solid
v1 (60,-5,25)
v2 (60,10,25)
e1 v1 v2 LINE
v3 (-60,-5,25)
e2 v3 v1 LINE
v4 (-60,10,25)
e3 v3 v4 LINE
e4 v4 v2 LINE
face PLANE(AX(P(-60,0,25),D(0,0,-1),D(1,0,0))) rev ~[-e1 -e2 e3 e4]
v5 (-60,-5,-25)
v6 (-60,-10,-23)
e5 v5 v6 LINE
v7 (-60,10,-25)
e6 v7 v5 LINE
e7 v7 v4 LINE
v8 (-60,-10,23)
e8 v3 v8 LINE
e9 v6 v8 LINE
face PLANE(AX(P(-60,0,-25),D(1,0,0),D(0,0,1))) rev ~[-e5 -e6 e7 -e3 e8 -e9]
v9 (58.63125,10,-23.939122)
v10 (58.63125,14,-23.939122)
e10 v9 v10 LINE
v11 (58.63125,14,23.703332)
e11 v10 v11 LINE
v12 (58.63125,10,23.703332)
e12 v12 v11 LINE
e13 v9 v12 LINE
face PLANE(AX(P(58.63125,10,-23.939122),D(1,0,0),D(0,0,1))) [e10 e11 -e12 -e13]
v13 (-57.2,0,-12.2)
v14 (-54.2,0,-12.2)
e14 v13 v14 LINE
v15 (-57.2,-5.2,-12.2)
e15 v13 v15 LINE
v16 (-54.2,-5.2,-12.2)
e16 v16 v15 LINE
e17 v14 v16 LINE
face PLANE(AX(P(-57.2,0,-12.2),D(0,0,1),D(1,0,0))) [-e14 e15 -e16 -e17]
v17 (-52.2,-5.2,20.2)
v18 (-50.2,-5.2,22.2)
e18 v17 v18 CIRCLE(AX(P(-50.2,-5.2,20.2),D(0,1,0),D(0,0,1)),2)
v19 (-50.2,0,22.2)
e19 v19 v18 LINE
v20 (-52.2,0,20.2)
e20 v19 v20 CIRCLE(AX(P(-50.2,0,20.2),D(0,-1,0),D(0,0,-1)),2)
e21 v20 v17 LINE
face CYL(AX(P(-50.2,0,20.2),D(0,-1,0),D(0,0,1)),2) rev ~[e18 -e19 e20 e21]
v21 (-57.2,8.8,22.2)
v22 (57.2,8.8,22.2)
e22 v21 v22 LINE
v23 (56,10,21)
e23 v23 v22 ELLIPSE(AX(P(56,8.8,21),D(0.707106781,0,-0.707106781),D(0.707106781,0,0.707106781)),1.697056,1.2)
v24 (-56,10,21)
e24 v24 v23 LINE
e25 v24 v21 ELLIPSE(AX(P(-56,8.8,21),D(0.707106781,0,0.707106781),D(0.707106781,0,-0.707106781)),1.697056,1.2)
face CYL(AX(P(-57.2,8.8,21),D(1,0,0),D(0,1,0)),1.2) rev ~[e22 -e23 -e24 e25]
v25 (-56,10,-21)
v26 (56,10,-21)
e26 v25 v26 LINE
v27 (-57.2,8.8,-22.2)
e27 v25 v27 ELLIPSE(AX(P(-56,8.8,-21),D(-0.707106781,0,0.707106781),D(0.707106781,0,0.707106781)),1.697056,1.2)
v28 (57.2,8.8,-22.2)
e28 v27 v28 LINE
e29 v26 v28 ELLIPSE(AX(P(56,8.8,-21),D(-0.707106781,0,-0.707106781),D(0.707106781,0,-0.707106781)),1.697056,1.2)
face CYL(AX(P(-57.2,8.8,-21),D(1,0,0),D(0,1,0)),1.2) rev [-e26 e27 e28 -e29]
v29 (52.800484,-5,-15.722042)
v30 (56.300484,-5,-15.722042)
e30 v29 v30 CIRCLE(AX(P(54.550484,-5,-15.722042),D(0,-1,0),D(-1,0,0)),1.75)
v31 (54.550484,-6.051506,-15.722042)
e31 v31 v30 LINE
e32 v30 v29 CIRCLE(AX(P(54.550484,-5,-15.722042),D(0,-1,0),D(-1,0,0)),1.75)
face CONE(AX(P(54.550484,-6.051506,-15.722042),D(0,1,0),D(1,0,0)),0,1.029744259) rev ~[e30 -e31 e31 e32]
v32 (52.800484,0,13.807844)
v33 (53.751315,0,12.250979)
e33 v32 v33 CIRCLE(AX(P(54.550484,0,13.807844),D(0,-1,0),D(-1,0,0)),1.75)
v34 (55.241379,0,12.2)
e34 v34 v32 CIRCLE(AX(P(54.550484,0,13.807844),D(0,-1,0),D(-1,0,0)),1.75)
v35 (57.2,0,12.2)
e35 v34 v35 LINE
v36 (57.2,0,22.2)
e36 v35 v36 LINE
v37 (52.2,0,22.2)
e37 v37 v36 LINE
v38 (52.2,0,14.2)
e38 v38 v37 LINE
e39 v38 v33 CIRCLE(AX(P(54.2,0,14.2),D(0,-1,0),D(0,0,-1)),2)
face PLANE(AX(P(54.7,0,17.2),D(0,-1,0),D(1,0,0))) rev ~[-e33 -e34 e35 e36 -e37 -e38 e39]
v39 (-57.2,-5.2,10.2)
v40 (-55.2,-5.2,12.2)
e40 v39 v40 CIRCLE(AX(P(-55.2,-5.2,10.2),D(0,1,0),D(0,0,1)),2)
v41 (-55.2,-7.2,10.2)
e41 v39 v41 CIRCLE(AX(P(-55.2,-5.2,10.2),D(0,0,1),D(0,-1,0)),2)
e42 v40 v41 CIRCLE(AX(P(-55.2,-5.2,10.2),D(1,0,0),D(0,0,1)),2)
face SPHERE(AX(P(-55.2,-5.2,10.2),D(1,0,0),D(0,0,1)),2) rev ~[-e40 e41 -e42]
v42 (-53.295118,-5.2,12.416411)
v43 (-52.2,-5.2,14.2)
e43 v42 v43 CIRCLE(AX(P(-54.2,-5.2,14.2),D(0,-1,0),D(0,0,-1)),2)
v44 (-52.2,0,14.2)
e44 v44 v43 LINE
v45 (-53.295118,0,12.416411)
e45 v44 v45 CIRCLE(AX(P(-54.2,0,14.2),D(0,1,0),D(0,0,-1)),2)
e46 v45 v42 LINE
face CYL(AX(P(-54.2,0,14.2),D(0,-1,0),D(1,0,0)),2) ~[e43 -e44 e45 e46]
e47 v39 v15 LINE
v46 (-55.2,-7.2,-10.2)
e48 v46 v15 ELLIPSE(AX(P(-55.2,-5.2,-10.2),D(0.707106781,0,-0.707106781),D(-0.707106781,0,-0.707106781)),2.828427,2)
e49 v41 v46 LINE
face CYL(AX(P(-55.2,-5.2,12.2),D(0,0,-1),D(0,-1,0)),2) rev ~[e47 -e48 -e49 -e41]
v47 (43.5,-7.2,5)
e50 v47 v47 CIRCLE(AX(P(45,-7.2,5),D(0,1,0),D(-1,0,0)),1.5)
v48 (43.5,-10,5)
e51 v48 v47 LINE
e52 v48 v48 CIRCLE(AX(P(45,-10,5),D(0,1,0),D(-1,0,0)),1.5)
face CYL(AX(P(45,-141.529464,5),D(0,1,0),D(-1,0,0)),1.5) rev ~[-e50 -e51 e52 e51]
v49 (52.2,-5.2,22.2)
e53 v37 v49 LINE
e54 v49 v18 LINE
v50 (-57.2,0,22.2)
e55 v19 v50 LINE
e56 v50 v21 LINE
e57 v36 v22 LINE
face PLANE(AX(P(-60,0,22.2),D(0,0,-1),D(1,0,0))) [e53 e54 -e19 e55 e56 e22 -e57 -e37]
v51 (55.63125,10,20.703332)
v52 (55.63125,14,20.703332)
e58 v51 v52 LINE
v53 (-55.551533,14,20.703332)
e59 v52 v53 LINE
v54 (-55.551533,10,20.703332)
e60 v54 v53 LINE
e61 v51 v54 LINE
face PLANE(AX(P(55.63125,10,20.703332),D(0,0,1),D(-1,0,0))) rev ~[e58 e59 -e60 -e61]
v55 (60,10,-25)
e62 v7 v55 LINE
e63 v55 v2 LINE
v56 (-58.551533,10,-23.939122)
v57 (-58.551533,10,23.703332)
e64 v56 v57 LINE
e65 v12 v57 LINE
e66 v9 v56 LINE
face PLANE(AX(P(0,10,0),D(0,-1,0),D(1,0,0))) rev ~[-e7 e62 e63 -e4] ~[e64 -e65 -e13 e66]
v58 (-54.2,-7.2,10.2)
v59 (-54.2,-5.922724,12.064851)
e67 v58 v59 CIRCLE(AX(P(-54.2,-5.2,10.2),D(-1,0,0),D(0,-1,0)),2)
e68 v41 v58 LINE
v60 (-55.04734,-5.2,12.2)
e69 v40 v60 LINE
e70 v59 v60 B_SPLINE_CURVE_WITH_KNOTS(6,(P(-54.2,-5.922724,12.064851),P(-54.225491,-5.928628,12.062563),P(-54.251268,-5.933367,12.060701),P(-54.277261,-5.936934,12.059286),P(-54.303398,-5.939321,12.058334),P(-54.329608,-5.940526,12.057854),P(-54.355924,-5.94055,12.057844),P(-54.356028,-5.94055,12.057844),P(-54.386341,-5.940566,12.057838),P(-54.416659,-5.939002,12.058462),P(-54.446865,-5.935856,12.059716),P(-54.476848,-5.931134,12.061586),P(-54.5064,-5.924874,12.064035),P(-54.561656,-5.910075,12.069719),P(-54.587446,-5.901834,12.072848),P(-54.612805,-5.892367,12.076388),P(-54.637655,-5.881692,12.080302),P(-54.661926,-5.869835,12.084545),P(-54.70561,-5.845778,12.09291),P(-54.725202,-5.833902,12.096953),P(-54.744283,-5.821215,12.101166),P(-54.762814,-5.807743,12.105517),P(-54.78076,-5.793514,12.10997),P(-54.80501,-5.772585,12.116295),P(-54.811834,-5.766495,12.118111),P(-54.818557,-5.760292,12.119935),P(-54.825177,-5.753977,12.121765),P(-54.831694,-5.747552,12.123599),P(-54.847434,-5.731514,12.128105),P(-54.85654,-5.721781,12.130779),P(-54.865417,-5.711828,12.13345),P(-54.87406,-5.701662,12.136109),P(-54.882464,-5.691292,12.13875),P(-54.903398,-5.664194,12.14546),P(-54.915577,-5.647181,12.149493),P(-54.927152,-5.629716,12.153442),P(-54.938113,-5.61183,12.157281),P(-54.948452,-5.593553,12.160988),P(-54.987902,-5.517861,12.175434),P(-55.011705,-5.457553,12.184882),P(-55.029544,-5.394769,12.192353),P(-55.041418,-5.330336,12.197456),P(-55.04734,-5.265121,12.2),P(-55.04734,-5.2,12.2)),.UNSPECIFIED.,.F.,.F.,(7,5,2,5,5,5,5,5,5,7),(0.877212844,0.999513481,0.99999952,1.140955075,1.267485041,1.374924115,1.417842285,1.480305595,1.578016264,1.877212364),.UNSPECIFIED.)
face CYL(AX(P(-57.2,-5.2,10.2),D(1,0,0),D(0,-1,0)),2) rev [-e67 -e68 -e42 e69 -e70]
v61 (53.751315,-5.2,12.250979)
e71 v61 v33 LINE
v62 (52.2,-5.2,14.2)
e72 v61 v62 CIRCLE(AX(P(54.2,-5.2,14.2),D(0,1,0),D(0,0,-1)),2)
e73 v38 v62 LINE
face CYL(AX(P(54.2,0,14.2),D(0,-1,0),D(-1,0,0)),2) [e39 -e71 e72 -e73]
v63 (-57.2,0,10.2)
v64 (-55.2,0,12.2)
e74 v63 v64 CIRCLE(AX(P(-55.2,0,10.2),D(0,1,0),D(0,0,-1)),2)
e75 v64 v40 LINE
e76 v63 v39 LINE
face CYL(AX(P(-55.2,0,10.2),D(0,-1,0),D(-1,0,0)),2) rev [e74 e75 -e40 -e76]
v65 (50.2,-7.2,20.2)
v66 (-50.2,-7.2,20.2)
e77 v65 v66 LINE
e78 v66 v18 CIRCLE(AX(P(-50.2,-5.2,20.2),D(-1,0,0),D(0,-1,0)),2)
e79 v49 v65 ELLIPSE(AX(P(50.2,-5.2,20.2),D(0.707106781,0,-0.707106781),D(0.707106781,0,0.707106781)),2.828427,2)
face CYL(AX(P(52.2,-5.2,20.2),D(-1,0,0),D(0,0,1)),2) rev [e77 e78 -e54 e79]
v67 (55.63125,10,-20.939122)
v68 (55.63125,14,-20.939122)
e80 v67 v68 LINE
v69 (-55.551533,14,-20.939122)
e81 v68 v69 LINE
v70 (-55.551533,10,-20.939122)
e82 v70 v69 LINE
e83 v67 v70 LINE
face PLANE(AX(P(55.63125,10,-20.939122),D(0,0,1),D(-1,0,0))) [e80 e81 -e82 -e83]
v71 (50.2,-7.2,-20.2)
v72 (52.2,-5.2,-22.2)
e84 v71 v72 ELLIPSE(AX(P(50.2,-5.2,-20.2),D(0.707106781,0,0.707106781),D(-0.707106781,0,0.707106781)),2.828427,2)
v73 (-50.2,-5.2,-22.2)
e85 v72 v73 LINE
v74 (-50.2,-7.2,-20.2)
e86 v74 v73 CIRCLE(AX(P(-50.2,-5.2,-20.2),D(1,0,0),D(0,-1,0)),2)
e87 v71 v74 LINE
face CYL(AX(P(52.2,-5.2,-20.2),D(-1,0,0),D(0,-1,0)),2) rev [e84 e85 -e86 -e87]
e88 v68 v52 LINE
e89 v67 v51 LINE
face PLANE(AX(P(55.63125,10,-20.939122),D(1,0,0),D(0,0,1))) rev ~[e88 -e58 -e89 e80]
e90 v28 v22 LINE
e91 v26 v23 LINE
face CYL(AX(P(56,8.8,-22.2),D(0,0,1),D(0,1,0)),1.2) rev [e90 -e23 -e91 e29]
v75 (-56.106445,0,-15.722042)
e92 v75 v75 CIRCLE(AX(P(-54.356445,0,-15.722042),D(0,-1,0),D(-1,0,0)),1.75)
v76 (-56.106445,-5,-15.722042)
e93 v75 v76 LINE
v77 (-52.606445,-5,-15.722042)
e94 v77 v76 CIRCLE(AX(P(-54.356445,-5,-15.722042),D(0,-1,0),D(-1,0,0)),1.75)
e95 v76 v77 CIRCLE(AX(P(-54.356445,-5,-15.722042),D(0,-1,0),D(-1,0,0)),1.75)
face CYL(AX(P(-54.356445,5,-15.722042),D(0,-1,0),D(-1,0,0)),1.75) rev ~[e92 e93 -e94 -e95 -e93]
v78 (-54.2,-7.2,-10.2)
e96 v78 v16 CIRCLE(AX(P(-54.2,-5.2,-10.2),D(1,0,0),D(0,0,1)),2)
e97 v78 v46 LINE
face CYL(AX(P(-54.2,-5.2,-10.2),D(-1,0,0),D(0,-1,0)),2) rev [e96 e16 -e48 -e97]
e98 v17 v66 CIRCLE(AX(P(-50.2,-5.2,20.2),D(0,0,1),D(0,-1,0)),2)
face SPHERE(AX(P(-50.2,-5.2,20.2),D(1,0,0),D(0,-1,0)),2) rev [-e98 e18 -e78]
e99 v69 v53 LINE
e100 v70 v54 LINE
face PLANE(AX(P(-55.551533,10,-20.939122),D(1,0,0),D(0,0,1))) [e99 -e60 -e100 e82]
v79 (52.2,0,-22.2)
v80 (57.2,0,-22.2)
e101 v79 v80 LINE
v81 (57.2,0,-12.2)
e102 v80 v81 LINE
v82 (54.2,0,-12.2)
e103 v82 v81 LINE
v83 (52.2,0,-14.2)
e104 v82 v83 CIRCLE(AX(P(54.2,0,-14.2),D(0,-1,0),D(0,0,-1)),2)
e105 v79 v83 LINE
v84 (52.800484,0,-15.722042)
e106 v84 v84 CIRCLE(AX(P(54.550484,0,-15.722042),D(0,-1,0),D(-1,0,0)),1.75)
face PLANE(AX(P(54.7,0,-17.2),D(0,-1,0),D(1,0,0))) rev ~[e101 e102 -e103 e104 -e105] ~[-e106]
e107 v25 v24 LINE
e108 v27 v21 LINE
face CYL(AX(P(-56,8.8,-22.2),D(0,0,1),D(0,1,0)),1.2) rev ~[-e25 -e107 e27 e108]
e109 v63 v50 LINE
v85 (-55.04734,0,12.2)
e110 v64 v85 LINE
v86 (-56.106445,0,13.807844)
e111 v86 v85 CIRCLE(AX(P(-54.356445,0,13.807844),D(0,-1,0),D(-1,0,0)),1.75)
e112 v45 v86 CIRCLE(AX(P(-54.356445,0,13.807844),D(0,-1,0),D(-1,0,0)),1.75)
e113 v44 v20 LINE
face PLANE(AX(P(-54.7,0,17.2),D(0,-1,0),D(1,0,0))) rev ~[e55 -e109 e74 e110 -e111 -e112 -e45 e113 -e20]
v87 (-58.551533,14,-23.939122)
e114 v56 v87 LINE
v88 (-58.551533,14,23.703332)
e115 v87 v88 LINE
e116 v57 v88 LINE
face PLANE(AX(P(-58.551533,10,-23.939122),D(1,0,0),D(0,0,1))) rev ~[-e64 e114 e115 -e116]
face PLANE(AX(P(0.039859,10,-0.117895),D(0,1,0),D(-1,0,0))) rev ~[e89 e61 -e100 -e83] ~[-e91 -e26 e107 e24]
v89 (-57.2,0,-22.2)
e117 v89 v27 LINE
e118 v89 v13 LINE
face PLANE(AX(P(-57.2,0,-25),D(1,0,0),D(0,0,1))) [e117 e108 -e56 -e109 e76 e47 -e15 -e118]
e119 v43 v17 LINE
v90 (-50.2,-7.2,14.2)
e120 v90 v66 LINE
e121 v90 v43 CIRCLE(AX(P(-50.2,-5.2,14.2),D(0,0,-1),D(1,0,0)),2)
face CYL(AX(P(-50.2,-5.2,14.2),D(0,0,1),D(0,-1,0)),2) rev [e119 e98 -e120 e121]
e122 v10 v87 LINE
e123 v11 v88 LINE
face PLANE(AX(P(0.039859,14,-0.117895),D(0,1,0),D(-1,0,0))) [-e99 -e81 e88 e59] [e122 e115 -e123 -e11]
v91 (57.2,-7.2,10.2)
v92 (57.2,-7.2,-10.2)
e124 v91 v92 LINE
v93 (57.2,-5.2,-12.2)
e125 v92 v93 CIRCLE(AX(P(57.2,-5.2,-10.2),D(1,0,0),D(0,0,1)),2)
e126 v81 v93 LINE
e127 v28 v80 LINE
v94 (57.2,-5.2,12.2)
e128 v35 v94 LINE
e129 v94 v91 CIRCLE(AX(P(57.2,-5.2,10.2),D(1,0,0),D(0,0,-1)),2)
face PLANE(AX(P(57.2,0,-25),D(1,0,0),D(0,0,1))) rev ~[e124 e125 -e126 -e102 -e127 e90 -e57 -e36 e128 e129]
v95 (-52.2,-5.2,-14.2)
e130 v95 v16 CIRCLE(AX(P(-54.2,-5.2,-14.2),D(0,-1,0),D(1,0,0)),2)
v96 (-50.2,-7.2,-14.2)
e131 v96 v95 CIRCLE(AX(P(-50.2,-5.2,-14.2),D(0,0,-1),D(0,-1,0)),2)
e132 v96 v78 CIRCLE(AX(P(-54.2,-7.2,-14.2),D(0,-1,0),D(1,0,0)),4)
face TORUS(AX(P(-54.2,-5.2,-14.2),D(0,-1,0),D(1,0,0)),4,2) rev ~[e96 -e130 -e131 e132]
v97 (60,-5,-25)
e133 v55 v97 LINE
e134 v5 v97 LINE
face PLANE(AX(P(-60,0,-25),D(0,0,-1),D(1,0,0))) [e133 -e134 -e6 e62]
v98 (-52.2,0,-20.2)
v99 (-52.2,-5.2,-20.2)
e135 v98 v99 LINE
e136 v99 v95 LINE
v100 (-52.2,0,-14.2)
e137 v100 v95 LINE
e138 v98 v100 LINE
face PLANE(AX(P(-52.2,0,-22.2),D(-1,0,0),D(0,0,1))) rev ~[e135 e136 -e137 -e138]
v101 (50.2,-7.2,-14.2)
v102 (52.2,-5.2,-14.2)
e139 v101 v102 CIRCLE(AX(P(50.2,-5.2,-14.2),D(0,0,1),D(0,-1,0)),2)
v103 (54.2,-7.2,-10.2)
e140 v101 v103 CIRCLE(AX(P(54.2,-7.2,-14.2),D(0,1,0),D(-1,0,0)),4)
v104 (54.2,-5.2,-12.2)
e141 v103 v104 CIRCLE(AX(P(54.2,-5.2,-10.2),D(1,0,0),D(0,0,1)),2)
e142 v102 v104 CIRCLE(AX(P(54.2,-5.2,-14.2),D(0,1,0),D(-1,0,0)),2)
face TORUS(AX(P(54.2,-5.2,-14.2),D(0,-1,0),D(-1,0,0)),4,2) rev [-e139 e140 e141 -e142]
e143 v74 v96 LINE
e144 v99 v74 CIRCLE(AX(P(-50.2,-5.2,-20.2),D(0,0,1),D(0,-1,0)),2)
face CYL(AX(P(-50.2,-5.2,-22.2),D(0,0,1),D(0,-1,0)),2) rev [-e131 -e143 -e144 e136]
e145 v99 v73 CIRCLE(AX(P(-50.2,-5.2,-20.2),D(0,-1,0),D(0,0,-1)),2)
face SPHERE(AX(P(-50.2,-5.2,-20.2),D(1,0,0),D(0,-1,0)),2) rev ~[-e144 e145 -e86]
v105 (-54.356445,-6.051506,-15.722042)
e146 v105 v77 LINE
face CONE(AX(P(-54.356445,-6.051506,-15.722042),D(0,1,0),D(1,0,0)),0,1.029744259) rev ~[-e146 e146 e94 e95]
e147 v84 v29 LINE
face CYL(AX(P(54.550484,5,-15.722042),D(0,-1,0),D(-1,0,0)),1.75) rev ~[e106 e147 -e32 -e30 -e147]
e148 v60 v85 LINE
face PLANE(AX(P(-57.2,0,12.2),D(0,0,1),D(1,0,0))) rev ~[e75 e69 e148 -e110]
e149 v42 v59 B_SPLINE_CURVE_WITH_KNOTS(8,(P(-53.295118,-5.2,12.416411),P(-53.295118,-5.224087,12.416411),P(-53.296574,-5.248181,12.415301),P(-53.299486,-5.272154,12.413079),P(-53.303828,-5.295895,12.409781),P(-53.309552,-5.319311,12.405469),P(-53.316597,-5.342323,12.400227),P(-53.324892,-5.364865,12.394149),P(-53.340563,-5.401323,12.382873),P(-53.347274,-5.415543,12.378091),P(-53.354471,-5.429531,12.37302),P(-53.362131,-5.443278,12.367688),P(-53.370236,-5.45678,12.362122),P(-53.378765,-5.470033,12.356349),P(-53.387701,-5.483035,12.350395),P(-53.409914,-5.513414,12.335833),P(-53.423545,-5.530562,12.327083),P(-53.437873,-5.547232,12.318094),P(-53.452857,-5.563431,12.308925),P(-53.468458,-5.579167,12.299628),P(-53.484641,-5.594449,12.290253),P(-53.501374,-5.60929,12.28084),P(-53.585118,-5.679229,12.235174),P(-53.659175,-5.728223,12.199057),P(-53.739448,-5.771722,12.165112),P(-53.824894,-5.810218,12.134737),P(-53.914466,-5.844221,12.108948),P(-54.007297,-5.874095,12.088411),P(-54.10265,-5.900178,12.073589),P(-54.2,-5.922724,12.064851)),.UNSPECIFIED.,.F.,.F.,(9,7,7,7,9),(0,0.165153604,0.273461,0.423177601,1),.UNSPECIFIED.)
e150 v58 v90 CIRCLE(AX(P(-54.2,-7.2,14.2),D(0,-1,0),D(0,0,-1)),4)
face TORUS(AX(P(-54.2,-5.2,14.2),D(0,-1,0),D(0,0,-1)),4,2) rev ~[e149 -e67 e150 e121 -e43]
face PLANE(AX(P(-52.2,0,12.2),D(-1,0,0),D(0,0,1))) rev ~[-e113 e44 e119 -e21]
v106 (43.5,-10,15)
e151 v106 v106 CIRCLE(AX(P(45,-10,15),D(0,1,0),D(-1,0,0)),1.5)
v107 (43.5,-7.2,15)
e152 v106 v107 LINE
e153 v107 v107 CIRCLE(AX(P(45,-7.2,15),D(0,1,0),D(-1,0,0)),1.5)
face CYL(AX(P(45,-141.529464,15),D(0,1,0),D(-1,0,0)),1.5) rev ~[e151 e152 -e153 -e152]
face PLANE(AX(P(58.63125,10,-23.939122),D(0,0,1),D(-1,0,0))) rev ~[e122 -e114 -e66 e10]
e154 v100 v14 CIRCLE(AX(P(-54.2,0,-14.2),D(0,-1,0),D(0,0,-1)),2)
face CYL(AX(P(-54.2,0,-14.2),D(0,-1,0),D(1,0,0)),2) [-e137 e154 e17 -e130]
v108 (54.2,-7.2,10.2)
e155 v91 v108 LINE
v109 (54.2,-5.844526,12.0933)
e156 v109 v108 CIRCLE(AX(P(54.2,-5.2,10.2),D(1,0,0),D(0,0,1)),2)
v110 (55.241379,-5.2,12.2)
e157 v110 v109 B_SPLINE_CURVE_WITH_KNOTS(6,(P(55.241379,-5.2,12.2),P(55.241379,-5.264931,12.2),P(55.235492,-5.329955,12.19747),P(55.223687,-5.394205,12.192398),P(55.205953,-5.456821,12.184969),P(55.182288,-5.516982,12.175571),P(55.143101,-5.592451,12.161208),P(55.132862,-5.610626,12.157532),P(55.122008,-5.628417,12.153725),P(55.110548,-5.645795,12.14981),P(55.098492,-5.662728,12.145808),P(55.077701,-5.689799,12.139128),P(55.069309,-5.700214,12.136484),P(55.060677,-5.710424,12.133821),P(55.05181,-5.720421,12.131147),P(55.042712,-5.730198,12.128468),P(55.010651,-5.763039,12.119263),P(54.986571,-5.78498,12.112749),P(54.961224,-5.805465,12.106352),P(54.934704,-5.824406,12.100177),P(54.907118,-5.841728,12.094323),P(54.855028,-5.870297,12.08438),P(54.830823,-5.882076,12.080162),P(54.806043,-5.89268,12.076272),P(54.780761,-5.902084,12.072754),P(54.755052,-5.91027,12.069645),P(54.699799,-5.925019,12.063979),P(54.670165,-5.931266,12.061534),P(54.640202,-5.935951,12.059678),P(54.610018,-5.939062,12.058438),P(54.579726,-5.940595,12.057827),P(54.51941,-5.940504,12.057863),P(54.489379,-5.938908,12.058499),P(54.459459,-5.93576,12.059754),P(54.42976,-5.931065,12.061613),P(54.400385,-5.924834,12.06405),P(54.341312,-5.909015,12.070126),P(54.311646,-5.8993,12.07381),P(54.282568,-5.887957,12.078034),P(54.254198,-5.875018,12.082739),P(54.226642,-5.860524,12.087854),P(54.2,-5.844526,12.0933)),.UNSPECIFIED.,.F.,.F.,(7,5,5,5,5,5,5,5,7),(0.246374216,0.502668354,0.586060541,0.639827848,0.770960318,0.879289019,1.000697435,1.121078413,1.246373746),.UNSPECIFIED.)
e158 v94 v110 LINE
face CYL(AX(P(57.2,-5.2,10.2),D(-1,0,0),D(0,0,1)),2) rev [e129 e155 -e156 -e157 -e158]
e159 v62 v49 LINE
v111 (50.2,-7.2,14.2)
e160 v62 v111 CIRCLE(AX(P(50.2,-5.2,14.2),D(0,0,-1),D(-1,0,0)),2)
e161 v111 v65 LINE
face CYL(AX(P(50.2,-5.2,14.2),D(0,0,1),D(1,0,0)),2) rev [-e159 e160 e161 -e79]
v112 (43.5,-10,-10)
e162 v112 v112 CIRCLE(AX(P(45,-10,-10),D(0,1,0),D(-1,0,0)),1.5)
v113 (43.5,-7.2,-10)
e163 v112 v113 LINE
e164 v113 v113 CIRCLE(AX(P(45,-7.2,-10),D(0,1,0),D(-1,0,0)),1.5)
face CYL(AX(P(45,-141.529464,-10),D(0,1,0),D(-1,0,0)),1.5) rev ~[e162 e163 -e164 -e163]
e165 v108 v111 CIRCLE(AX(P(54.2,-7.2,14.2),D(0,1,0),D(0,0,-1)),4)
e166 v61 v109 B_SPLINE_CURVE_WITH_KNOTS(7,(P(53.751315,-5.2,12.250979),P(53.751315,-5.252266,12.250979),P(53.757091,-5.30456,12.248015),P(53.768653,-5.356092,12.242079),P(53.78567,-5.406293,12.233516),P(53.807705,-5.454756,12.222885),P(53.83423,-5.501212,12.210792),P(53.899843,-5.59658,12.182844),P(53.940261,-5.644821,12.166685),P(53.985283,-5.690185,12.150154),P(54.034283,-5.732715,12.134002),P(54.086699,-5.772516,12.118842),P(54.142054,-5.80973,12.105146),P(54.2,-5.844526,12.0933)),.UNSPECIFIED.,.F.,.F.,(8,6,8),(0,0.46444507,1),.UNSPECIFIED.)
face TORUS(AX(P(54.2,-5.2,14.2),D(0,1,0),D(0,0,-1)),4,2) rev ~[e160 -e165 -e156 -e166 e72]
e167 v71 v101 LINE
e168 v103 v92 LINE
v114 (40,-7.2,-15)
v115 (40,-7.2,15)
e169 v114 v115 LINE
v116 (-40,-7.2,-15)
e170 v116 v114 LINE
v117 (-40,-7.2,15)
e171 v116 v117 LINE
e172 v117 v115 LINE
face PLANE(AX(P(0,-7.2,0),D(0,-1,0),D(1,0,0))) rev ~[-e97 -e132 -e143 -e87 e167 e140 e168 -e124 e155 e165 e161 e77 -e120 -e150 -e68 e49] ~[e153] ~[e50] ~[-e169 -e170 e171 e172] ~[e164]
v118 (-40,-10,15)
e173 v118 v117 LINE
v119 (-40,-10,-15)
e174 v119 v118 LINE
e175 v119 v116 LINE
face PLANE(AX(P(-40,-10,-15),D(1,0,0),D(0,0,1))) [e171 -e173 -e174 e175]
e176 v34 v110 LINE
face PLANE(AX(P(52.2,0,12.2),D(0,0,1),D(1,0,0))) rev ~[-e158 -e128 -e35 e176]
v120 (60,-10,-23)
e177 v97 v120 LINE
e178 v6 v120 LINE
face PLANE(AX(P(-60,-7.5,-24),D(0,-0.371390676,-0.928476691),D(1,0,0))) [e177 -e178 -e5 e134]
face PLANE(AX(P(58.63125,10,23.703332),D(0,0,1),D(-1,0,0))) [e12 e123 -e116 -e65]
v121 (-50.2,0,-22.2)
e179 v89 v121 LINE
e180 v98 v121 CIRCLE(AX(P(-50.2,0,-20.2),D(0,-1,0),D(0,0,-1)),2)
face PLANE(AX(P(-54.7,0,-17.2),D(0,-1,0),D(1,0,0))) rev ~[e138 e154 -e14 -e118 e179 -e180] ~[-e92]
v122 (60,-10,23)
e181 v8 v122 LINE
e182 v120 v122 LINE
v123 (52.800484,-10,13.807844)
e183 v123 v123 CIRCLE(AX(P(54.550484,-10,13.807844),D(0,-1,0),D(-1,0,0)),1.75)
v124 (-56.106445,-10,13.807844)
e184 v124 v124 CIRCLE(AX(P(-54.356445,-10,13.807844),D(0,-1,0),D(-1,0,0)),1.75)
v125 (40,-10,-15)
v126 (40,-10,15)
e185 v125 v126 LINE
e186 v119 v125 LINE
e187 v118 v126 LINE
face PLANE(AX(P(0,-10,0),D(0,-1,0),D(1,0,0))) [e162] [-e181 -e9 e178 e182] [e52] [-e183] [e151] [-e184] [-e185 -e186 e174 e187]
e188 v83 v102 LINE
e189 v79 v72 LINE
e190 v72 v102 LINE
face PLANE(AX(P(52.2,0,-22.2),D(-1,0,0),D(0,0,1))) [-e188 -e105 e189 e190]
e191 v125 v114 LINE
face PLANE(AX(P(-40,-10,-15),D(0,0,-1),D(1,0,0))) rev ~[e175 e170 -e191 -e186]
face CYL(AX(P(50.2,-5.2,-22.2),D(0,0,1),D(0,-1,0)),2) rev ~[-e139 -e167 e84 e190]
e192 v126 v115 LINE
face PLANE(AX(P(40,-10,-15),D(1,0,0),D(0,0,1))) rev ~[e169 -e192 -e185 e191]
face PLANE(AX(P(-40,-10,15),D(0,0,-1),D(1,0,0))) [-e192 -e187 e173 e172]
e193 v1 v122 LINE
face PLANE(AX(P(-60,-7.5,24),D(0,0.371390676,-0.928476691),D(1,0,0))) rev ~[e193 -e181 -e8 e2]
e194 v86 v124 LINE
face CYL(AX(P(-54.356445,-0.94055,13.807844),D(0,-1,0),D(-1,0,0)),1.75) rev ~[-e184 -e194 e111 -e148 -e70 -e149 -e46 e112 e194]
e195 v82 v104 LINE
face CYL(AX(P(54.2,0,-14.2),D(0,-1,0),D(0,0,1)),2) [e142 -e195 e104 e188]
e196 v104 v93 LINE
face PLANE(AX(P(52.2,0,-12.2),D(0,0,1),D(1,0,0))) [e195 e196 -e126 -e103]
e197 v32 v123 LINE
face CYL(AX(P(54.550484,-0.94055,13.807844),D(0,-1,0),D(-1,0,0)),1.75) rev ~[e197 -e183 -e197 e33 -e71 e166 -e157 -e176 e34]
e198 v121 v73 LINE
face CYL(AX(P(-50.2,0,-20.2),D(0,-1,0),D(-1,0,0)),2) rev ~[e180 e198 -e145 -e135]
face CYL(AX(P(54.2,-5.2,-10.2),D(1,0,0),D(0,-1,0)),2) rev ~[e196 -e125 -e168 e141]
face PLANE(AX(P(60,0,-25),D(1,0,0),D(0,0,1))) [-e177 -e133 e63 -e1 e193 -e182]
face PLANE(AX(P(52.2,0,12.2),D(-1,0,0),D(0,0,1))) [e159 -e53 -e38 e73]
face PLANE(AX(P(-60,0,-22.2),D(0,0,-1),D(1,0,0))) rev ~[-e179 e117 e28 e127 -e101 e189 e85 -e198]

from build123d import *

# Parameters (mm, degrees)
F0_W          = 120
F0_H          = 50
F1_DEPTH      = 10
F1_DEPTH_BACK = 10
F2_T          = -2.8
F3_W          = 80
F3_H          = 30
F4_DEPTH      = 20.001
F6_W          = 5
F6_H          = 10
F7_DEPTH      = 7.2
F8_F1_R       = 2
F8_F2_R       = 2
F9_SIZE2      = 2
F9_SIZE       = 5
F9_2_SIZE2    = 2
F9_2_SIZE     = 5
F10_D         = 3
F12_D         = 3.5
F12_DEPTH     = 5
F12_START     = 5.9405501
F12_TIP       = 1.0515060833
F13_W         = 117.182782799
F13_H         = 47.6424540132
F13_W_2       = 111.182782799
F13_H_2       = 41.6424540132
F14_DEPTH     = 4
F15_R         = 1.2


with BuildPart() as f1:
    # F0 (on Front) → F1 (new body, two sides)
    with BuildSketch(Plane.XZ) as f1_sk:
        Rectangle(F0_W, F0_H)
    extrude(amount=F1_DEPTH)
    extrude(f1_sk.sketch, amount=-F1_DEPTH_BACK)

    # F2
    f2_openings = [f1.faces().sort_by_distance(p)[0] for p in [
        (0, 10, 0),
    ]]
    offset(amount=F2_T, openings=f2_openings)

    # F3 (on face) → F4 (cut, through all)
    with BuildSketch(Plane.XZ.offset(10)):
        Rectangle(F3_W, F3_H)
    extrude(amount=-F4_DEPTH, mode=Mode.SUBTRACT)

    # F6 (on Front) → F7 (join, through all)
    with BuildSketch(Plane.XZ):
        with Locations((54.7, 17.2)):
            Rectangle(F6_W, F6_H)
        with Locations((54.7, -17.2)):
            Rectangle(F6_W, F6_H)
        with Locations((-54.7, 17.2)):
            Rectangle(F6_W, F6_H)
        with Locations((-54.7, -17.2)):
            Rectangle(F6_W, F6_H)
    extrude(amount=F7_DEPTH)

    # F8: fillet of radius 2 on 14 edges, made by hand

    # F8_f1
    f8_f1_edges = [f1.edges().sort_by_distance(p)[0] for p in [
        (52.2, -3.6, 12.2),
        (-52.2, -3.6, 12.2),
        (-52.2, -3.6, -12.2),
        (52.2, -3.6, -12.2),
    ]]
    fillet(f8_f1_edges, radius=F8_F1_R)

    # F8_f2
    f8_f2_edges = [f1.edges().sort_by_distance(p)[0] for p in [
        (52.2, -7.2, -18.2),
        (52.2, -7.2, 18.2),
        (0, -7.2, 22.2),
        (-52.2, -7.2, 18.2),
        (-52.2, -3.6, 22.2),
        (-57.2, -3.6, 12.2),
        (-57.2, -7.2, 0),
        (0, -7.2, -22.2),
        (-52.2, -7.2, -18.2),
        (-52.2, -3.6, -22.2),
        (-52.7857864376, -7.2, -12.7857864376),
        (-52.7857864376, -7.2, 12.7857864376),
        (52.7857864376, -7.2, 12.7857864376),
        (52.7857864376, -7.2, -12.7857864376),
    ]]
    fillet(f8_f2_edges, radius=F8_F2_R)

    # F9
    f9_edges = [f1.edges().sort_by_distance(p)[0] for p in [
        (0, -10, -25),
    ]]
    f9_side = f1.faces().sort_by_distance((0, 0, -25))[0]
    chamfer(f9_edges, length=F9_SIZE, length2=F9_SIZE2, reference=f9_side)

    # F9#2
    f9_2_edges = [f1.edges().sort_by_distance(p)[0] for p in [
        (0, -10, 25),
    ]]
    f9_2_side = f1.faces().sort_by_distance((0, 0, 25))[0]
    chamfer(f9_2_edges, length=F9_2_SIZE, length2=F9_2_SIZE2, reference=f9_2_side)

    # F10 (through all)
    with Locations(Plane.XZ.offset(10)):
        with Locations((45, 5), (45, 15), (45, -10)):
            Hole(F10_D / 2)

    # F12
    # its depths count from where the whole tool has entered the part; down to there all is cleared
    with Locations(Plane(origin=(0, 0, 0), x_dir=(1, 0, 0), z_dir=(0, 1, 0))):
        with Locations((54.5504838228, -13.8078443706), (-54.356444627, -13.8078443706)):
            Hole(F12_D / 2, depth=F12_START)
    with Locations(Plane(origin=(0, 0, 0), x_dir=(1, 0, 0), z_dir=(0, 1, 0))):
        with Locations((54.5504838228, -13.8078443706, -F12_START), (-54.356444627, -13.8078443706, -F12_START), (-54.356444627, 15.7220419496, 0), (54.5504838228, 15.7220419496, 0)):
            Hole(F12_D / 2, depth=F12_DEPTH)
            with Locations((0, 0, -(F12_DEPTH + F12_TIP / 2))):  # 118° drill point
                Cone(0, F12_D / 2, F12_TIP, mode=Mode.SUBTRACT)

    # F13 (on face) → F14 (join)
    with BuildSketch(Plane(origin=(0, 10, 0), x_dir=(-1, 0, 0), z_dir=(0, 1, 0))):
        with Locations((-0.0398587435, -0.1178945079)):
            Rectangle(F13_W, F13_H)
        with Locations((-0.0398587435, -0.1178945079)):
            Rectangle(F13_W_2, F13_H_2, mode=Mode.SUBTRACT)
    extrude(amount=F14_DEPTH)

    # F15
    f15_edges = [f1.edges().sort_by_distance(p)[0] for p in [
        (0, 10, 22.2),
        (-57.2, 10, 0),
        (0, 10, -22.2),
        (57.2, 10, 0),
    ]]
    fillet(f15_edges, radius=F15_R)


solid = f1.part
